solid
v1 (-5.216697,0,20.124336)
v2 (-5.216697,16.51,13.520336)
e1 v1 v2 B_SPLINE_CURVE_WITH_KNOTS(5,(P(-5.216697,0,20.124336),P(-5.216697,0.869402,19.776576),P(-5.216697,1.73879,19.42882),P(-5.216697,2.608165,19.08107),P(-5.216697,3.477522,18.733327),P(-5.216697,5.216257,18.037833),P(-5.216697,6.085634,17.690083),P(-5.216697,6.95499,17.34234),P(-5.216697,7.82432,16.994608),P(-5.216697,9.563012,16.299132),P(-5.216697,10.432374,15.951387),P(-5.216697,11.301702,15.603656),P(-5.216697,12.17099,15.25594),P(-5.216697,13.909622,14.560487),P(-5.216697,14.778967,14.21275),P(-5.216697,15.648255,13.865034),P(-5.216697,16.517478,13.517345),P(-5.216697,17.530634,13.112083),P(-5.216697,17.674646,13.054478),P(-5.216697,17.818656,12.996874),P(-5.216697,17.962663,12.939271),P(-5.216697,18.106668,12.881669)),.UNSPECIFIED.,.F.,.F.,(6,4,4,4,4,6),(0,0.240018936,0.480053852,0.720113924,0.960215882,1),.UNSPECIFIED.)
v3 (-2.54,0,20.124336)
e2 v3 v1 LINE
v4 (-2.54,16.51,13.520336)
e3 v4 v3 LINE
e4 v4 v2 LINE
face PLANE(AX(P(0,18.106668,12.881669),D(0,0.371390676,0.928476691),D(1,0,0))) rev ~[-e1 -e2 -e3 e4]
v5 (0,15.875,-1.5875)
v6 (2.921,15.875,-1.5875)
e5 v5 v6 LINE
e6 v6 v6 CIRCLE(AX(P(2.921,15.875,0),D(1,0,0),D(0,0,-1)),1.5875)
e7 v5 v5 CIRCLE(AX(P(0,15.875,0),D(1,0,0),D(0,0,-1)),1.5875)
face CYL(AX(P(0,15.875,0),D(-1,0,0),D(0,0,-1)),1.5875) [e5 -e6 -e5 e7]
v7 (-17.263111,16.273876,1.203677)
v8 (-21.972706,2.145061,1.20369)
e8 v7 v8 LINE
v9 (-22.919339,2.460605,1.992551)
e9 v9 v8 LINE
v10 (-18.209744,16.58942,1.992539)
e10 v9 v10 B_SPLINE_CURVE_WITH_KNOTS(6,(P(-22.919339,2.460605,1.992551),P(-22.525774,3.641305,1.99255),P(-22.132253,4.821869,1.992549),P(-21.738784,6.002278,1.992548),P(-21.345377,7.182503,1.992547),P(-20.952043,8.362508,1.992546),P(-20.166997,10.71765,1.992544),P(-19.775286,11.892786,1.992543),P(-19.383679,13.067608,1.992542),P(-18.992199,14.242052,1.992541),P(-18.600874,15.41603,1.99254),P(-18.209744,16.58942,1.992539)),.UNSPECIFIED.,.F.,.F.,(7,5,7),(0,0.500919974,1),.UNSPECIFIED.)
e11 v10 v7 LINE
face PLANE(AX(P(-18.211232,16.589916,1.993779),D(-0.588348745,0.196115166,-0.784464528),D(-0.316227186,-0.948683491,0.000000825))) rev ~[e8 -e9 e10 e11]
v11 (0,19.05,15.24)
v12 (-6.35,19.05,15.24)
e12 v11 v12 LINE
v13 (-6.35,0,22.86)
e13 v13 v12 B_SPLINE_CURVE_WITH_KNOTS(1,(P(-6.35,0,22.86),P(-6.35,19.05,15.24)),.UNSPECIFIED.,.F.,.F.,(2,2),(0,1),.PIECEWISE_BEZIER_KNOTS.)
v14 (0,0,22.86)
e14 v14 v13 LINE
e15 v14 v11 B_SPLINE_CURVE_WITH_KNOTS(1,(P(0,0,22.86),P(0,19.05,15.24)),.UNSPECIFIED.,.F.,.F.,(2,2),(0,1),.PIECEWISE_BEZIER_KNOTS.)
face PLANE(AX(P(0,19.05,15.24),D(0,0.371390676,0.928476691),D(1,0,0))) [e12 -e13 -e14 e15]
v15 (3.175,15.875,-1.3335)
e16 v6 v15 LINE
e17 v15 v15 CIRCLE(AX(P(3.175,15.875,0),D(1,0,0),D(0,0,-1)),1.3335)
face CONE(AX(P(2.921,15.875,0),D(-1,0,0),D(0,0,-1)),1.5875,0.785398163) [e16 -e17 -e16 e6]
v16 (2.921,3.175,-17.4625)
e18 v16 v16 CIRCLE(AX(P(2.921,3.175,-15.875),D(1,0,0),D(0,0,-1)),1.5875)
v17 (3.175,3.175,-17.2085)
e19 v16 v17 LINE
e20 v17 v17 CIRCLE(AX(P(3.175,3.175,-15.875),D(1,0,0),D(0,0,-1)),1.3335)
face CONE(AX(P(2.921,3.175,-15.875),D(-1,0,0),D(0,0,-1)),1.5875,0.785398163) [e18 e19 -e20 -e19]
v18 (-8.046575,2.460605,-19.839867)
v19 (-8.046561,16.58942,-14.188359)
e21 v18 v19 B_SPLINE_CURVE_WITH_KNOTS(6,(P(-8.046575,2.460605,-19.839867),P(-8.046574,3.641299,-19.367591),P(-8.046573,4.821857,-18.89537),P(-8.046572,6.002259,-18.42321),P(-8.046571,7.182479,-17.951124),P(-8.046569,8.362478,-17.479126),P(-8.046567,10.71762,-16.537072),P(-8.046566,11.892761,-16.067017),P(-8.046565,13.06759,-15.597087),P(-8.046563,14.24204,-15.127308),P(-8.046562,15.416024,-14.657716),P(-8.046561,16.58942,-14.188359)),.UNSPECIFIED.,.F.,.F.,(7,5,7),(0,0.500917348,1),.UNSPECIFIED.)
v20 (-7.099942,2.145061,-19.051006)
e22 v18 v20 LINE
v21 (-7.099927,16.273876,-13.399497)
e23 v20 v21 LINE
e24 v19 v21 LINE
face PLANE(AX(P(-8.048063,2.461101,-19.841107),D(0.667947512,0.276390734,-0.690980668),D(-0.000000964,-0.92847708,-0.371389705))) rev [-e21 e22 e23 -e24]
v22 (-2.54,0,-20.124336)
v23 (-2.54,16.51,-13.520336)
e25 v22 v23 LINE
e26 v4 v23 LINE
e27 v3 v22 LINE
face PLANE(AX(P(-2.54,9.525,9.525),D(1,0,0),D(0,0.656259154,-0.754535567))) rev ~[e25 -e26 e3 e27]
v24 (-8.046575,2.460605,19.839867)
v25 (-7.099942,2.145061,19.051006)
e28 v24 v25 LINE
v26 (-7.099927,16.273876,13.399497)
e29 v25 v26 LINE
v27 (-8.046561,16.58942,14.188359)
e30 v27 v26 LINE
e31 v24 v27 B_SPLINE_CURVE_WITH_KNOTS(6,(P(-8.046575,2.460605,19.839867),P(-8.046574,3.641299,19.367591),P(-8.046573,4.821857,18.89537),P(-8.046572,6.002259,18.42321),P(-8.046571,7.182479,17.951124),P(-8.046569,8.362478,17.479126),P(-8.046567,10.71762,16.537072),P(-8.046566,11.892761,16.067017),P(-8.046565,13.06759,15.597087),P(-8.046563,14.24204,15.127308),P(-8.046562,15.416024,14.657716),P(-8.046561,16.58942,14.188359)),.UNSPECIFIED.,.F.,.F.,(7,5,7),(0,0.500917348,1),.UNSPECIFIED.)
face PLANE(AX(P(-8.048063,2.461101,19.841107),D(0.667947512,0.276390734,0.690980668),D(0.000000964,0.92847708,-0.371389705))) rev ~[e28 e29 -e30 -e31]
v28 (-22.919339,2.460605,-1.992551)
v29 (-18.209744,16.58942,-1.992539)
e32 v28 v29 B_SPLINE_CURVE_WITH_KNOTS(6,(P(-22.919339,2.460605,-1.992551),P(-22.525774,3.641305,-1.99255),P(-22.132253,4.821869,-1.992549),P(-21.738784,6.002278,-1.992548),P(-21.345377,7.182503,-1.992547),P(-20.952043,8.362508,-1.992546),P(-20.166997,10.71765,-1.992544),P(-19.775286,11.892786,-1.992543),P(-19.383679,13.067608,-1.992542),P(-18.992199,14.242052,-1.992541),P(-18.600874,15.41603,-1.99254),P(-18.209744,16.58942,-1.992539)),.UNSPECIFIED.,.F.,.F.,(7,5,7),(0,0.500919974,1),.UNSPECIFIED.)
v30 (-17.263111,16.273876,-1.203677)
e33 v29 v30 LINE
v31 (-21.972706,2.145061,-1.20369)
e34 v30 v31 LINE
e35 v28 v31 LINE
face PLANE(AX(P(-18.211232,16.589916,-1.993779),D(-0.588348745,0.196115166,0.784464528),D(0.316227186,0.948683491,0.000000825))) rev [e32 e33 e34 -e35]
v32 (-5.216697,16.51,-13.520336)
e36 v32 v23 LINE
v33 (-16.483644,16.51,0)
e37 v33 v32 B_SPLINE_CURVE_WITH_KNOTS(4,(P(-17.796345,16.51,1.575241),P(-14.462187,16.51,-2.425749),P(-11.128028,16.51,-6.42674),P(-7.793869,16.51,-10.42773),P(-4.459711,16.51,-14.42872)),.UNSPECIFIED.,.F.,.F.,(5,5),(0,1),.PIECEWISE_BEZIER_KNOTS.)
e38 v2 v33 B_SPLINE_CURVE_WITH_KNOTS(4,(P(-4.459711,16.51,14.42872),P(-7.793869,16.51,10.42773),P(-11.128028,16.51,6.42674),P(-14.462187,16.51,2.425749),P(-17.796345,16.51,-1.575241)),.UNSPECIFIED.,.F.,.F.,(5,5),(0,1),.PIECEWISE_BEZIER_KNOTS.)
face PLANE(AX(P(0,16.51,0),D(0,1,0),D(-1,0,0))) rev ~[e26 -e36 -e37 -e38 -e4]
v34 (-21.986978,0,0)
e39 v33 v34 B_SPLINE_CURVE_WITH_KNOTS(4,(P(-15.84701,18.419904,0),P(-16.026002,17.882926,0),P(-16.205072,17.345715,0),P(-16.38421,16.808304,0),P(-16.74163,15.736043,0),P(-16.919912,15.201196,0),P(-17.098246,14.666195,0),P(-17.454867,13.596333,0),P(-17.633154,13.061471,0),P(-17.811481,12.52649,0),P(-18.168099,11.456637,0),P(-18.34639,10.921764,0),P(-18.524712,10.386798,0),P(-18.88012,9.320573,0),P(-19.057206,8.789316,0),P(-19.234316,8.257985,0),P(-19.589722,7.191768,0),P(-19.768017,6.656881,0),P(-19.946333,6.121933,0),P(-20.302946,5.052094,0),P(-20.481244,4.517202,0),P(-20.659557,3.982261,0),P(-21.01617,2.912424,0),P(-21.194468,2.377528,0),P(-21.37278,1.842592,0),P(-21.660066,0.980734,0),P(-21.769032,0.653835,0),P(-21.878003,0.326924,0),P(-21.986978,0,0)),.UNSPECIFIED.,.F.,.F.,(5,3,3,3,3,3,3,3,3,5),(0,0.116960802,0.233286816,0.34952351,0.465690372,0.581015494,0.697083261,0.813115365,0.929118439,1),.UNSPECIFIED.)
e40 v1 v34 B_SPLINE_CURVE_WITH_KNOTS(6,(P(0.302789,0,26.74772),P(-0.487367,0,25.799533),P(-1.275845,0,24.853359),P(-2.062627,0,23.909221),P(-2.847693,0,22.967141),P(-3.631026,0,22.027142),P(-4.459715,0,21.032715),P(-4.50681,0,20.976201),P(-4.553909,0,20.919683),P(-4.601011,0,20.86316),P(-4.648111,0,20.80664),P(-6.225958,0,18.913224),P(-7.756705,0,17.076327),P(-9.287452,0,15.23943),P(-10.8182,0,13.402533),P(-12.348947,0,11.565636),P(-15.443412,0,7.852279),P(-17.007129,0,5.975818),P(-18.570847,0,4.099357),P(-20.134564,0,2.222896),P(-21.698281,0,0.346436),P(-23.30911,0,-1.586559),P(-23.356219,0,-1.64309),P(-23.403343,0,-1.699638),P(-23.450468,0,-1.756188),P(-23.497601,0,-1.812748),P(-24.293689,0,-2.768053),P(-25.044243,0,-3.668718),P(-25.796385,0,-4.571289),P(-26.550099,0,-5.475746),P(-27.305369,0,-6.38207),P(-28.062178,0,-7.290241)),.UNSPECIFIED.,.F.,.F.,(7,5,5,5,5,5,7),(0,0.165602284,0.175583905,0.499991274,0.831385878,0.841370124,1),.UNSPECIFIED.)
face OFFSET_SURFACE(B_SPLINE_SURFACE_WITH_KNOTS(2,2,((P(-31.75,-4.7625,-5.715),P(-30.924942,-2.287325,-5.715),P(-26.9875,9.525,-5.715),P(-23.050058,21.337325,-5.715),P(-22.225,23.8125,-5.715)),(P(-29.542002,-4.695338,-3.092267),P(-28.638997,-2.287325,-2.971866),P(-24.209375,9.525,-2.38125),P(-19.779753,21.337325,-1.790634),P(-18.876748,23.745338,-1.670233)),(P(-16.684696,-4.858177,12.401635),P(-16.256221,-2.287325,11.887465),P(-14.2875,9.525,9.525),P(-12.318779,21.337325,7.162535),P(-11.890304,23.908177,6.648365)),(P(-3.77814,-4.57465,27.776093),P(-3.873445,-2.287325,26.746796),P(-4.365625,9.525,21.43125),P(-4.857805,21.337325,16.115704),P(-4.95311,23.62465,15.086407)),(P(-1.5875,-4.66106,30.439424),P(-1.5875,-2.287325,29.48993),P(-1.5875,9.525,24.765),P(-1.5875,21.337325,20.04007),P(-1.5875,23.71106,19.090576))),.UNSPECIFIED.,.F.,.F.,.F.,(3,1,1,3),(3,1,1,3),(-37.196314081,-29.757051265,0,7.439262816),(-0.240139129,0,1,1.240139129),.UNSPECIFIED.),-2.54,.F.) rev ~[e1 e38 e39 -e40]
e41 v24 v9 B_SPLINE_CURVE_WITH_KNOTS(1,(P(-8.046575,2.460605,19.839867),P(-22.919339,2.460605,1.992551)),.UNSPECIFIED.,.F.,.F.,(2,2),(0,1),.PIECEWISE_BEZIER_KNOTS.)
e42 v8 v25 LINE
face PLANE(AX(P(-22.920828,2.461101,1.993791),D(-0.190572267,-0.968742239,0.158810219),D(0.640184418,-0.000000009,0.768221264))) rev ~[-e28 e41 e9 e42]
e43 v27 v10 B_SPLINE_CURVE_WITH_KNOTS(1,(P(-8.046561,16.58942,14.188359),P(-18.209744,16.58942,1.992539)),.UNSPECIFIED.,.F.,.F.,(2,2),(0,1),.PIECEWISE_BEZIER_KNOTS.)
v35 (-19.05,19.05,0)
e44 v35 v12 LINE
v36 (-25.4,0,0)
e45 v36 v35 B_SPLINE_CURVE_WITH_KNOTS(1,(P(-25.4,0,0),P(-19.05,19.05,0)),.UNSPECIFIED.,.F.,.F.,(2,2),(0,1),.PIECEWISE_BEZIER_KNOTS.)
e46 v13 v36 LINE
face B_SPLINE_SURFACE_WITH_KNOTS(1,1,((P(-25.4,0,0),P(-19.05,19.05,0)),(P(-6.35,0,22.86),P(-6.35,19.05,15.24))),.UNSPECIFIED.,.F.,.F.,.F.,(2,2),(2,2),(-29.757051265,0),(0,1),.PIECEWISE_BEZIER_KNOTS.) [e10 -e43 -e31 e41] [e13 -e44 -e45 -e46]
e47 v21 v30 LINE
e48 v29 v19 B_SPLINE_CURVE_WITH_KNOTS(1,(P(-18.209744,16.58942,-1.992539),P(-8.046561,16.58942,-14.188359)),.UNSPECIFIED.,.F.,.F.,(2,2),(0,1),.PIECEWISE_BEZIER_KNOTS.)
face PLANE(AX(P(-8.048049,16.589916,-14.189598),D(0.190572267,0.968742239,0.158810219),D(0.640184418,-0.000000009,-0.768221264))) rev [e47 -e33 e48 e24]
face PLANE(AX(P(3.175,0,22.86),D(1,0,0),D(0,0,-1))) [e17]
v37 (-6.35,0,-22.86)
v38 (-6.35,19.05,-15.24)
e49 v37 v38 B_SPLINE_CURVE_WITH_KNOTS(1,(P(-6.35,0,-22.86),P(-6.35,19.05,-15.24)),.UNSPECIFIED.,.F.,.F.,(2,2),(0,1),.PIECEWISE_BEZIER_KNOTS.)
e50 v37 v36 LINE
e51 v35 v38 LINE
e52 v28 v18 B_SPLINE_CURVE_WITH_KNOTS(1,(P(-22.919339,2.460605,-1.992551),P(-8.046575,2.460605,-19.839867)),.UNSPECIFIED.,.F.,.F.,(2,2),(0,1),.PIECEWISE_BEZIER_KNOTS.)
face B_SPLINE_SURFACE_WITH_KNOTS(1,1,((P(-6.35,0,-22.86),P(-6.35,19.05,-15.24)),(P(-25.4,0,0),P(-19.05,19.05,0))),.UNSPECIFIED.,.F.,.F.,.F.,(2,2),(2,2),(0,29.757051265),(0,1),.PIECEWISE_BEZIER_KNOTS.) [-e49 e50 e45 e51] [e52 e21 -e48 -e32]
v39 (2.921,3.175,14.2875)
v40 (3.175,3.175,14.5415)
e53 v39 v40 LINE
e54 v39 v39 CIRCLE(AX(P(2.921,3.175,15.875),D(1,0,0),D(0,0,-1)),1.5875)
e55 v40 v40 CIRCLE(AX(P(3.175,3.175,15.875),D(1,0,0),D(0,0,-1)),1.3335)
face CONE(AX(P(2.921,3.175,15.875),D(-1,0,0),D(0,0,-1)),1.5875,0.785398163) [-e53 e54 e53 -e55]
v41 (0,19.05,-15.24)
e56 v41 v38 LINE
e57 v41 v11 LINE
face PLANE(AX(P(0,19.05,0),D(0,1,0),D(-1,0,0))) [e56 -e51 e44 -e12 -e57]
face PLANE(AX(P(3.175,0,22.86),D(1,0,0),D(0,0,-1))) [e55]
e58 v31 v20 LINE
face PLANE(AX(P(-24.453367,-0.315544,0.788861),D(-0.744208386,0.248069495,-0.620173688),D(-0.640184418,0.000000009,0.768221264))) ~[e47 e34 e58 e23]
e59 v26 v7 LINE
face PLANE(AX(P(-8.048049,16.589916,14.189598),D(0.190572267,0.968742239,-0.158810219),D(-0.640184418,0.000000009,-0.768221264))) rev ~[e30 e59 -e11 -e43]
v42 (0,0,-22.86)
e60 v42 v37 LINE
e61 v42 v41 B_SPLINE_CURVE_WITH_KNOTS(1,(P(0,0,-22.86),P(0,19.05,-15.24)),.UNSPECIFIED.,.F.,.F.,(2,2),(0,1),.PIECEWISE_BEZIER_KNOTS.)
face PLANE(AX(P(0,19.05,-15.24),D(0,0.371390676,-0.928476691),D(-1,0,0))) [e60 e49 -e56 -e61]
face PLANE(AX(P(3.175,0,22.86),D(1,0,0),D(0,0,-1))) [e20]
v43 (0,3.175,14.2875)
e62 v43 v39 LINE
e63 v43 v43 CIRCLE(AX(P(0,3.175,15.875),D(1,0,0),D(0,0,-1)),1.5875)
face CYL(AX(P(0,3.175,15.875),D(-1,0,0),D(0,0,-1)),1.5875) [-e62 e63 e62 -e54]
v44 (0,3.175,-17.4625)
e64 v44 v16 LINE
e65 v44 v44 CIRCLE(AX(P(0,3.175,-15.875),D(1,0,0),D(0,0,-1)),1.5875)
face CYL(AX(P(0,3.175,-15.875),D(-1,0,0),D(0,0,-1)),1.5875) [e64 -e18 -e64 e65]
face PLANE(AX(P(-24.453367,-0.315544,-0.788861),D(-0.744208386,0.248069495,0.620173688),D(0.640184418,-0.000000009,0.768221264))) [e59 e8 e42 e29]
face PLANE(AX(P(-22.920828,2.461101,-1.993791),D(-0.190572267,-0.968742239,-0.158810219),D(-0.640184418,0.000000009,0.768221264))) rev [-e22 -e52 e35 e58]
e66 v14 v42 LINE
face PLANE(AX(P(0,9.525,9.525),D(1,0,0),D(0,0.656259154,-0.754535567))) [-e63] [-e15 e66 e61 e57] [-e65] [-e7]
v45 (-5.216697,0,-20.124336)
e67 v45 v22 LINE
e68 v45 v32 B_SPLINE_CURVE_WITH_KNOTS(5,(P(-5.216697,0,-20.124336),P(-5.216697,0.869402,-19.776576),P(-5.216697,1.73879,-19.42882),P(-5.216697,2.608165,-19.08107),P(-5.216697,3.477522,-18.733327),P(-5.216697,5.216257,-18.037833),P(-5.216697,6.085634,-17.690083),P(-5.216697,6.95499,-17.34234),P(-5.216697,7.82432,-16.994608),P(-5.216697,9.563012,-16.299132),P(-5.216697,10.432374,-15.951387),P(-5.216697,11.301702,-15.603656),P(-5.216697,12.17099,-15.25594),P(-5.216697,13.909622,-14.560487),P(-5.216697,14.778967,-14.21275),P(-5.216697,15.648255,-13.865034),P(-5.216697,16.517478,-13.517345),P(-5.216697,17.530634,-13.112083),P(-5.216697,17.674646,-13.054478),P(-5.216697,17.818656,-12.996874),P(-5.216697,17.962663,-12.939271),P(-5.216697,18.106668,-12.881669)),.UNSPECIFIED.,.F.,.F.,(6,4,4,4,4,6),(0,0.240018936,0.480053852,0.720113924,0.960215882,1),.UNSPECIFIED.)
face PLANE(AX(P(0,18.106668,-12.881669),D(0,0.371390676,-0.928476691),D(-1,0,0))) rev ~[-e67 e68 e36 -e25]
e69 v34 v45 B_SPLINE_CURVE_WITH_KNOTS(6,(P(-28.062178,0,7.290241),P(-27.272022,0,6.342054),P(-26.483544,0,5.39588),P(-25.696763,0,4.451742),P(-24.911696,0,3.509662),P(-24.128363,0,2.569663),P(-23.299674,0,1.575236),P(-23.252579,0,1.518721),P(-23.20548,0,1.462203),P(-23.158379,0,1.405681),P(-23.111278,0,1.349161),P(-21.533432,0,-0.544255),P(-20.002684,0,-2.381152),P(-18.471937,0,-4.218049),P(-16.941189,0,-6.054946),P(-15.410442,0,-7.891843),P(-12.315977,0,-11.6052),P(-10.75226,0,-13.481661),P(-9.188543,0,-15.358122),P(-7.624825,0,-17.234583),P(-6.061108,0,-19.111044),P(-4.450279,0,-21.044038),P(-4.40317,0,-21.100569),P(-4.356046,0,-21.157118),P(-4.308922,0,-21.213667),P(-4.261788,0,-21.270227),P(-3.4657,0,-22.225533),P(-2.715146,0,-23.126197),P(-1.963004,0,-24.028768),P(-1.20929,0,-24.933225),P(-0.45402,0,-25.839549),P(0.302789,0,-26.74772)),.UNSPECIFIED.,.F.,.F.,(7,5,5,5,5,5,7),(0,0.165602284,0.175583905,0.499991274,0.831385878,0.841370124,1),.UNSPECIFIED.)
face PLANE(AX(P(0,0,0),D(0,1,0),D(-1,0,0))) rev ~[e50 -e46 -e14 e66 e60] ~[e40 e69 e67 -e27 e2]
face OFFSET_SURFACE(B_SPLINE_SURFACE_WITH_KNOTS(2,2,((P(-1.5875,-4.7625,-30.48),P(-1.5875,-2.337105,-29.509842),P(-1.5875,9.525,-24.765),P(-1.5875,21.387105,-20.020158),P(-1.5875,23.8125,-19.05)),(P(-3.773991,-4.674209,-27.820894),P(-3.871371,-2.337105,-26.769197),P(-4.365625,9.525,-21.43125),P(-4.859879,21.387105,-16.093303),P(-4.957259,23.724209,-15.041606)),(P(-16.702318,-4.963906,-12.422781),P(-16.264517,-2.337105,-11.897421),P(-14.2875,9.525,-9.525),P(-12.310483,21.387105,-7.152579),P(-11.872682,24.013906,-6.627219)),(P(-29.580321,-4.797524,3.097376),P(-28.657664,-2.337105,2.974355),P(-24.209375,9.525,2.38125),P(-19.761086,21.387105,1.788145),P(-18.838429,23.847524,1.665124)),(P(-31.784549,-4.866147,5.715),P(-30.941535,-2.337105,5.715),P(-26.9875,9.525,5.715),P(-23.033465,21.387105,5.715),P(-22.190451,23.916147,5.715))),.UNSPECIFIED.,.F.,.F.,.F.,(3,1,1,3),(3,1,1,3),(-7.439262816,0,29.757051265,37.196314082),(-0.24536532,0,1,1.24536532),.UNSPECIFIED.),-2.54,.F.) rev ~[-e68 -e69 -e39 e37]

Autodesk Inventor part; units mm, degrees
ref_plane "YZ Plane" through (0, 0, 0) normal (1, 0, 0) x (0, 1, 0)
ref_plane "XY Plane" through (0, 0, 0) normal (0, 0, 1) x (1, 0, 0)
sketch "Bottom sketch" plane through (0, 0, 0) normal (0, 1, 0) x (-1, 0, 0)
  line L0 (0, 0) -> (0, -22.86)
  line L1 (0, -22.86) -> (6.35, -22.86)
  line L2 (6.35, -22.86) -> (25.4, -22.86) construction
  line L3 (25.4, -22.86) -> (25.4, 0) construction
  line L4 (6.35, -22.86) -> (25.4, 0)
  line L5 (25.4, 0) -> (0, 0) construction
  line L6 (0, 0) -> (0, 22.86)
  line L7 (0, 22.86) -> (6.35, 22.86)
  line L8 (6.35, 22.86) -> (25.4, 0)
  dimension "d0" = 22.86
  dimension "d1" = 6.35
  dimension "d2" = 19.05
  dimension "d3" = 25.4
ref_plane "Work Plane1" through (0, 19.05, 0) normal (0, 1, 0) x (-1, 0, 0)
sketch "Top sketch" plane through (0, 19.05, 0) normal (0, 1, 0) x (-1, 0, 0)
  line L0 (0, 0) -> (0, -15.24)
  line L1 (0, -15.24) -> (6.35, -15.24)
  line L2 (6.35, -15.24) -> (19.05, -15.24) construction
  line L3 (19.05, -15.24) -> (19.05, 0) construction
  line L4 (19.05, 0) -> (0, 0) construction
  line L5 (19.05, 0) -> (6.35, -15.24)
  line L6 (0, 0) -> (0, 15.24)
  line L7 (0, 15.24) -> (6.35, 15.24)
  line L8 (19.05, 0) -> (6.35, 15.24)
  dimension "d5" = 15.24
  dimension "d6" = 6.35
  dimension "d7" = 12.7
loft "Loft1" add profiles "Bottom sketch", "Top sketch"
shell "Cow catcher shell" thickness 2.54 removed faces 1 at (-10.5833, 0, 7.62)
sketch "Cut out sketch" plane through (-25.4, 0, 0) normal (-0.7442084, 0.2480695, 0.6201737) x (0.6401844, 0, 0.7682213)
  line L0 (6.1338, 17.1247) -> (3.1188, 2.54)
  line L1 (3.1188, 2.54) -> (26.3508, 2.54)
  line L2 (26.3508, 2.54) -> (22.0092, 17.1247)
  line L3 (22.0092, 17.1247) -> (6.1338, 17.1247)
  line L4 (0, 0) -> (29.7571, 0) projected
  line L5 (29.7571, 0) -> (23.9032, 19.6647) projected
  line L6 (4.0652, 19.6647) -> (23.9032, 19.6647) projected
  line L7 (0, 0) -> (4.0652, 19.6647) projected
  line L8 (29.7571, 0) -> (23.9032, 19.6647) projected
  dimension "d13" = 2.54
  dimension "d14" = 2.54
  dimension "d15" = 2.54
  dimension "d16" = 2.54
extrude "Cut out extrution" cut sketch "Cut out sketch" against normal blind 1.27 contours L3 L2 L1 L0
ref_plane "Work Plane2" through (-6.35, 57.15, 0) normal (0, 0, 1) x (1, 0, 0)
mirror "Cut out mirror" about plane through (-6.35, 57.15, 0) normal (0, 0, 1) of "Cut out extrution"
sketch "Back peg sketch" plane through (0, 0, 22.86) normal (1, 0, 0) x (0, 0, -1)
  circle A0 centre (6.985, 3.175) radius 1.5875
  circle A1 centre (22.86, 15.875) radius 1.5875
  line L0 (0, 0) -> (45.72, 0) projected
  line L1 (22.86, 0) -> (22.86, 19.05) construction
  line L2 (22.86, 19.05) -> (22.86, 0) construction
  circle A2 centre (38.735, 3.175) radius 1.5875
  dimension "d19" = 3.175
  dimension "d20" = 3.175
  dimension "d21" = 3.175
  dimension "d22" = 6.985
  dimension "d23" = 15.875
  dimension "d24" = 45.72
  dimension "d25" = 22.86
extrude "Back peg extrution" add sketch "Back peg sketch" along normal blind 3.175
chamfer "Peg chamfer" distance 0.254 angle 45 3 edges at (3.175, 15.875, 1.5875) (3.175, 3.175, 17.4625) (3.175, 3.175, -14.2875)
properties part number "Caufield_Cow_Catcher"
